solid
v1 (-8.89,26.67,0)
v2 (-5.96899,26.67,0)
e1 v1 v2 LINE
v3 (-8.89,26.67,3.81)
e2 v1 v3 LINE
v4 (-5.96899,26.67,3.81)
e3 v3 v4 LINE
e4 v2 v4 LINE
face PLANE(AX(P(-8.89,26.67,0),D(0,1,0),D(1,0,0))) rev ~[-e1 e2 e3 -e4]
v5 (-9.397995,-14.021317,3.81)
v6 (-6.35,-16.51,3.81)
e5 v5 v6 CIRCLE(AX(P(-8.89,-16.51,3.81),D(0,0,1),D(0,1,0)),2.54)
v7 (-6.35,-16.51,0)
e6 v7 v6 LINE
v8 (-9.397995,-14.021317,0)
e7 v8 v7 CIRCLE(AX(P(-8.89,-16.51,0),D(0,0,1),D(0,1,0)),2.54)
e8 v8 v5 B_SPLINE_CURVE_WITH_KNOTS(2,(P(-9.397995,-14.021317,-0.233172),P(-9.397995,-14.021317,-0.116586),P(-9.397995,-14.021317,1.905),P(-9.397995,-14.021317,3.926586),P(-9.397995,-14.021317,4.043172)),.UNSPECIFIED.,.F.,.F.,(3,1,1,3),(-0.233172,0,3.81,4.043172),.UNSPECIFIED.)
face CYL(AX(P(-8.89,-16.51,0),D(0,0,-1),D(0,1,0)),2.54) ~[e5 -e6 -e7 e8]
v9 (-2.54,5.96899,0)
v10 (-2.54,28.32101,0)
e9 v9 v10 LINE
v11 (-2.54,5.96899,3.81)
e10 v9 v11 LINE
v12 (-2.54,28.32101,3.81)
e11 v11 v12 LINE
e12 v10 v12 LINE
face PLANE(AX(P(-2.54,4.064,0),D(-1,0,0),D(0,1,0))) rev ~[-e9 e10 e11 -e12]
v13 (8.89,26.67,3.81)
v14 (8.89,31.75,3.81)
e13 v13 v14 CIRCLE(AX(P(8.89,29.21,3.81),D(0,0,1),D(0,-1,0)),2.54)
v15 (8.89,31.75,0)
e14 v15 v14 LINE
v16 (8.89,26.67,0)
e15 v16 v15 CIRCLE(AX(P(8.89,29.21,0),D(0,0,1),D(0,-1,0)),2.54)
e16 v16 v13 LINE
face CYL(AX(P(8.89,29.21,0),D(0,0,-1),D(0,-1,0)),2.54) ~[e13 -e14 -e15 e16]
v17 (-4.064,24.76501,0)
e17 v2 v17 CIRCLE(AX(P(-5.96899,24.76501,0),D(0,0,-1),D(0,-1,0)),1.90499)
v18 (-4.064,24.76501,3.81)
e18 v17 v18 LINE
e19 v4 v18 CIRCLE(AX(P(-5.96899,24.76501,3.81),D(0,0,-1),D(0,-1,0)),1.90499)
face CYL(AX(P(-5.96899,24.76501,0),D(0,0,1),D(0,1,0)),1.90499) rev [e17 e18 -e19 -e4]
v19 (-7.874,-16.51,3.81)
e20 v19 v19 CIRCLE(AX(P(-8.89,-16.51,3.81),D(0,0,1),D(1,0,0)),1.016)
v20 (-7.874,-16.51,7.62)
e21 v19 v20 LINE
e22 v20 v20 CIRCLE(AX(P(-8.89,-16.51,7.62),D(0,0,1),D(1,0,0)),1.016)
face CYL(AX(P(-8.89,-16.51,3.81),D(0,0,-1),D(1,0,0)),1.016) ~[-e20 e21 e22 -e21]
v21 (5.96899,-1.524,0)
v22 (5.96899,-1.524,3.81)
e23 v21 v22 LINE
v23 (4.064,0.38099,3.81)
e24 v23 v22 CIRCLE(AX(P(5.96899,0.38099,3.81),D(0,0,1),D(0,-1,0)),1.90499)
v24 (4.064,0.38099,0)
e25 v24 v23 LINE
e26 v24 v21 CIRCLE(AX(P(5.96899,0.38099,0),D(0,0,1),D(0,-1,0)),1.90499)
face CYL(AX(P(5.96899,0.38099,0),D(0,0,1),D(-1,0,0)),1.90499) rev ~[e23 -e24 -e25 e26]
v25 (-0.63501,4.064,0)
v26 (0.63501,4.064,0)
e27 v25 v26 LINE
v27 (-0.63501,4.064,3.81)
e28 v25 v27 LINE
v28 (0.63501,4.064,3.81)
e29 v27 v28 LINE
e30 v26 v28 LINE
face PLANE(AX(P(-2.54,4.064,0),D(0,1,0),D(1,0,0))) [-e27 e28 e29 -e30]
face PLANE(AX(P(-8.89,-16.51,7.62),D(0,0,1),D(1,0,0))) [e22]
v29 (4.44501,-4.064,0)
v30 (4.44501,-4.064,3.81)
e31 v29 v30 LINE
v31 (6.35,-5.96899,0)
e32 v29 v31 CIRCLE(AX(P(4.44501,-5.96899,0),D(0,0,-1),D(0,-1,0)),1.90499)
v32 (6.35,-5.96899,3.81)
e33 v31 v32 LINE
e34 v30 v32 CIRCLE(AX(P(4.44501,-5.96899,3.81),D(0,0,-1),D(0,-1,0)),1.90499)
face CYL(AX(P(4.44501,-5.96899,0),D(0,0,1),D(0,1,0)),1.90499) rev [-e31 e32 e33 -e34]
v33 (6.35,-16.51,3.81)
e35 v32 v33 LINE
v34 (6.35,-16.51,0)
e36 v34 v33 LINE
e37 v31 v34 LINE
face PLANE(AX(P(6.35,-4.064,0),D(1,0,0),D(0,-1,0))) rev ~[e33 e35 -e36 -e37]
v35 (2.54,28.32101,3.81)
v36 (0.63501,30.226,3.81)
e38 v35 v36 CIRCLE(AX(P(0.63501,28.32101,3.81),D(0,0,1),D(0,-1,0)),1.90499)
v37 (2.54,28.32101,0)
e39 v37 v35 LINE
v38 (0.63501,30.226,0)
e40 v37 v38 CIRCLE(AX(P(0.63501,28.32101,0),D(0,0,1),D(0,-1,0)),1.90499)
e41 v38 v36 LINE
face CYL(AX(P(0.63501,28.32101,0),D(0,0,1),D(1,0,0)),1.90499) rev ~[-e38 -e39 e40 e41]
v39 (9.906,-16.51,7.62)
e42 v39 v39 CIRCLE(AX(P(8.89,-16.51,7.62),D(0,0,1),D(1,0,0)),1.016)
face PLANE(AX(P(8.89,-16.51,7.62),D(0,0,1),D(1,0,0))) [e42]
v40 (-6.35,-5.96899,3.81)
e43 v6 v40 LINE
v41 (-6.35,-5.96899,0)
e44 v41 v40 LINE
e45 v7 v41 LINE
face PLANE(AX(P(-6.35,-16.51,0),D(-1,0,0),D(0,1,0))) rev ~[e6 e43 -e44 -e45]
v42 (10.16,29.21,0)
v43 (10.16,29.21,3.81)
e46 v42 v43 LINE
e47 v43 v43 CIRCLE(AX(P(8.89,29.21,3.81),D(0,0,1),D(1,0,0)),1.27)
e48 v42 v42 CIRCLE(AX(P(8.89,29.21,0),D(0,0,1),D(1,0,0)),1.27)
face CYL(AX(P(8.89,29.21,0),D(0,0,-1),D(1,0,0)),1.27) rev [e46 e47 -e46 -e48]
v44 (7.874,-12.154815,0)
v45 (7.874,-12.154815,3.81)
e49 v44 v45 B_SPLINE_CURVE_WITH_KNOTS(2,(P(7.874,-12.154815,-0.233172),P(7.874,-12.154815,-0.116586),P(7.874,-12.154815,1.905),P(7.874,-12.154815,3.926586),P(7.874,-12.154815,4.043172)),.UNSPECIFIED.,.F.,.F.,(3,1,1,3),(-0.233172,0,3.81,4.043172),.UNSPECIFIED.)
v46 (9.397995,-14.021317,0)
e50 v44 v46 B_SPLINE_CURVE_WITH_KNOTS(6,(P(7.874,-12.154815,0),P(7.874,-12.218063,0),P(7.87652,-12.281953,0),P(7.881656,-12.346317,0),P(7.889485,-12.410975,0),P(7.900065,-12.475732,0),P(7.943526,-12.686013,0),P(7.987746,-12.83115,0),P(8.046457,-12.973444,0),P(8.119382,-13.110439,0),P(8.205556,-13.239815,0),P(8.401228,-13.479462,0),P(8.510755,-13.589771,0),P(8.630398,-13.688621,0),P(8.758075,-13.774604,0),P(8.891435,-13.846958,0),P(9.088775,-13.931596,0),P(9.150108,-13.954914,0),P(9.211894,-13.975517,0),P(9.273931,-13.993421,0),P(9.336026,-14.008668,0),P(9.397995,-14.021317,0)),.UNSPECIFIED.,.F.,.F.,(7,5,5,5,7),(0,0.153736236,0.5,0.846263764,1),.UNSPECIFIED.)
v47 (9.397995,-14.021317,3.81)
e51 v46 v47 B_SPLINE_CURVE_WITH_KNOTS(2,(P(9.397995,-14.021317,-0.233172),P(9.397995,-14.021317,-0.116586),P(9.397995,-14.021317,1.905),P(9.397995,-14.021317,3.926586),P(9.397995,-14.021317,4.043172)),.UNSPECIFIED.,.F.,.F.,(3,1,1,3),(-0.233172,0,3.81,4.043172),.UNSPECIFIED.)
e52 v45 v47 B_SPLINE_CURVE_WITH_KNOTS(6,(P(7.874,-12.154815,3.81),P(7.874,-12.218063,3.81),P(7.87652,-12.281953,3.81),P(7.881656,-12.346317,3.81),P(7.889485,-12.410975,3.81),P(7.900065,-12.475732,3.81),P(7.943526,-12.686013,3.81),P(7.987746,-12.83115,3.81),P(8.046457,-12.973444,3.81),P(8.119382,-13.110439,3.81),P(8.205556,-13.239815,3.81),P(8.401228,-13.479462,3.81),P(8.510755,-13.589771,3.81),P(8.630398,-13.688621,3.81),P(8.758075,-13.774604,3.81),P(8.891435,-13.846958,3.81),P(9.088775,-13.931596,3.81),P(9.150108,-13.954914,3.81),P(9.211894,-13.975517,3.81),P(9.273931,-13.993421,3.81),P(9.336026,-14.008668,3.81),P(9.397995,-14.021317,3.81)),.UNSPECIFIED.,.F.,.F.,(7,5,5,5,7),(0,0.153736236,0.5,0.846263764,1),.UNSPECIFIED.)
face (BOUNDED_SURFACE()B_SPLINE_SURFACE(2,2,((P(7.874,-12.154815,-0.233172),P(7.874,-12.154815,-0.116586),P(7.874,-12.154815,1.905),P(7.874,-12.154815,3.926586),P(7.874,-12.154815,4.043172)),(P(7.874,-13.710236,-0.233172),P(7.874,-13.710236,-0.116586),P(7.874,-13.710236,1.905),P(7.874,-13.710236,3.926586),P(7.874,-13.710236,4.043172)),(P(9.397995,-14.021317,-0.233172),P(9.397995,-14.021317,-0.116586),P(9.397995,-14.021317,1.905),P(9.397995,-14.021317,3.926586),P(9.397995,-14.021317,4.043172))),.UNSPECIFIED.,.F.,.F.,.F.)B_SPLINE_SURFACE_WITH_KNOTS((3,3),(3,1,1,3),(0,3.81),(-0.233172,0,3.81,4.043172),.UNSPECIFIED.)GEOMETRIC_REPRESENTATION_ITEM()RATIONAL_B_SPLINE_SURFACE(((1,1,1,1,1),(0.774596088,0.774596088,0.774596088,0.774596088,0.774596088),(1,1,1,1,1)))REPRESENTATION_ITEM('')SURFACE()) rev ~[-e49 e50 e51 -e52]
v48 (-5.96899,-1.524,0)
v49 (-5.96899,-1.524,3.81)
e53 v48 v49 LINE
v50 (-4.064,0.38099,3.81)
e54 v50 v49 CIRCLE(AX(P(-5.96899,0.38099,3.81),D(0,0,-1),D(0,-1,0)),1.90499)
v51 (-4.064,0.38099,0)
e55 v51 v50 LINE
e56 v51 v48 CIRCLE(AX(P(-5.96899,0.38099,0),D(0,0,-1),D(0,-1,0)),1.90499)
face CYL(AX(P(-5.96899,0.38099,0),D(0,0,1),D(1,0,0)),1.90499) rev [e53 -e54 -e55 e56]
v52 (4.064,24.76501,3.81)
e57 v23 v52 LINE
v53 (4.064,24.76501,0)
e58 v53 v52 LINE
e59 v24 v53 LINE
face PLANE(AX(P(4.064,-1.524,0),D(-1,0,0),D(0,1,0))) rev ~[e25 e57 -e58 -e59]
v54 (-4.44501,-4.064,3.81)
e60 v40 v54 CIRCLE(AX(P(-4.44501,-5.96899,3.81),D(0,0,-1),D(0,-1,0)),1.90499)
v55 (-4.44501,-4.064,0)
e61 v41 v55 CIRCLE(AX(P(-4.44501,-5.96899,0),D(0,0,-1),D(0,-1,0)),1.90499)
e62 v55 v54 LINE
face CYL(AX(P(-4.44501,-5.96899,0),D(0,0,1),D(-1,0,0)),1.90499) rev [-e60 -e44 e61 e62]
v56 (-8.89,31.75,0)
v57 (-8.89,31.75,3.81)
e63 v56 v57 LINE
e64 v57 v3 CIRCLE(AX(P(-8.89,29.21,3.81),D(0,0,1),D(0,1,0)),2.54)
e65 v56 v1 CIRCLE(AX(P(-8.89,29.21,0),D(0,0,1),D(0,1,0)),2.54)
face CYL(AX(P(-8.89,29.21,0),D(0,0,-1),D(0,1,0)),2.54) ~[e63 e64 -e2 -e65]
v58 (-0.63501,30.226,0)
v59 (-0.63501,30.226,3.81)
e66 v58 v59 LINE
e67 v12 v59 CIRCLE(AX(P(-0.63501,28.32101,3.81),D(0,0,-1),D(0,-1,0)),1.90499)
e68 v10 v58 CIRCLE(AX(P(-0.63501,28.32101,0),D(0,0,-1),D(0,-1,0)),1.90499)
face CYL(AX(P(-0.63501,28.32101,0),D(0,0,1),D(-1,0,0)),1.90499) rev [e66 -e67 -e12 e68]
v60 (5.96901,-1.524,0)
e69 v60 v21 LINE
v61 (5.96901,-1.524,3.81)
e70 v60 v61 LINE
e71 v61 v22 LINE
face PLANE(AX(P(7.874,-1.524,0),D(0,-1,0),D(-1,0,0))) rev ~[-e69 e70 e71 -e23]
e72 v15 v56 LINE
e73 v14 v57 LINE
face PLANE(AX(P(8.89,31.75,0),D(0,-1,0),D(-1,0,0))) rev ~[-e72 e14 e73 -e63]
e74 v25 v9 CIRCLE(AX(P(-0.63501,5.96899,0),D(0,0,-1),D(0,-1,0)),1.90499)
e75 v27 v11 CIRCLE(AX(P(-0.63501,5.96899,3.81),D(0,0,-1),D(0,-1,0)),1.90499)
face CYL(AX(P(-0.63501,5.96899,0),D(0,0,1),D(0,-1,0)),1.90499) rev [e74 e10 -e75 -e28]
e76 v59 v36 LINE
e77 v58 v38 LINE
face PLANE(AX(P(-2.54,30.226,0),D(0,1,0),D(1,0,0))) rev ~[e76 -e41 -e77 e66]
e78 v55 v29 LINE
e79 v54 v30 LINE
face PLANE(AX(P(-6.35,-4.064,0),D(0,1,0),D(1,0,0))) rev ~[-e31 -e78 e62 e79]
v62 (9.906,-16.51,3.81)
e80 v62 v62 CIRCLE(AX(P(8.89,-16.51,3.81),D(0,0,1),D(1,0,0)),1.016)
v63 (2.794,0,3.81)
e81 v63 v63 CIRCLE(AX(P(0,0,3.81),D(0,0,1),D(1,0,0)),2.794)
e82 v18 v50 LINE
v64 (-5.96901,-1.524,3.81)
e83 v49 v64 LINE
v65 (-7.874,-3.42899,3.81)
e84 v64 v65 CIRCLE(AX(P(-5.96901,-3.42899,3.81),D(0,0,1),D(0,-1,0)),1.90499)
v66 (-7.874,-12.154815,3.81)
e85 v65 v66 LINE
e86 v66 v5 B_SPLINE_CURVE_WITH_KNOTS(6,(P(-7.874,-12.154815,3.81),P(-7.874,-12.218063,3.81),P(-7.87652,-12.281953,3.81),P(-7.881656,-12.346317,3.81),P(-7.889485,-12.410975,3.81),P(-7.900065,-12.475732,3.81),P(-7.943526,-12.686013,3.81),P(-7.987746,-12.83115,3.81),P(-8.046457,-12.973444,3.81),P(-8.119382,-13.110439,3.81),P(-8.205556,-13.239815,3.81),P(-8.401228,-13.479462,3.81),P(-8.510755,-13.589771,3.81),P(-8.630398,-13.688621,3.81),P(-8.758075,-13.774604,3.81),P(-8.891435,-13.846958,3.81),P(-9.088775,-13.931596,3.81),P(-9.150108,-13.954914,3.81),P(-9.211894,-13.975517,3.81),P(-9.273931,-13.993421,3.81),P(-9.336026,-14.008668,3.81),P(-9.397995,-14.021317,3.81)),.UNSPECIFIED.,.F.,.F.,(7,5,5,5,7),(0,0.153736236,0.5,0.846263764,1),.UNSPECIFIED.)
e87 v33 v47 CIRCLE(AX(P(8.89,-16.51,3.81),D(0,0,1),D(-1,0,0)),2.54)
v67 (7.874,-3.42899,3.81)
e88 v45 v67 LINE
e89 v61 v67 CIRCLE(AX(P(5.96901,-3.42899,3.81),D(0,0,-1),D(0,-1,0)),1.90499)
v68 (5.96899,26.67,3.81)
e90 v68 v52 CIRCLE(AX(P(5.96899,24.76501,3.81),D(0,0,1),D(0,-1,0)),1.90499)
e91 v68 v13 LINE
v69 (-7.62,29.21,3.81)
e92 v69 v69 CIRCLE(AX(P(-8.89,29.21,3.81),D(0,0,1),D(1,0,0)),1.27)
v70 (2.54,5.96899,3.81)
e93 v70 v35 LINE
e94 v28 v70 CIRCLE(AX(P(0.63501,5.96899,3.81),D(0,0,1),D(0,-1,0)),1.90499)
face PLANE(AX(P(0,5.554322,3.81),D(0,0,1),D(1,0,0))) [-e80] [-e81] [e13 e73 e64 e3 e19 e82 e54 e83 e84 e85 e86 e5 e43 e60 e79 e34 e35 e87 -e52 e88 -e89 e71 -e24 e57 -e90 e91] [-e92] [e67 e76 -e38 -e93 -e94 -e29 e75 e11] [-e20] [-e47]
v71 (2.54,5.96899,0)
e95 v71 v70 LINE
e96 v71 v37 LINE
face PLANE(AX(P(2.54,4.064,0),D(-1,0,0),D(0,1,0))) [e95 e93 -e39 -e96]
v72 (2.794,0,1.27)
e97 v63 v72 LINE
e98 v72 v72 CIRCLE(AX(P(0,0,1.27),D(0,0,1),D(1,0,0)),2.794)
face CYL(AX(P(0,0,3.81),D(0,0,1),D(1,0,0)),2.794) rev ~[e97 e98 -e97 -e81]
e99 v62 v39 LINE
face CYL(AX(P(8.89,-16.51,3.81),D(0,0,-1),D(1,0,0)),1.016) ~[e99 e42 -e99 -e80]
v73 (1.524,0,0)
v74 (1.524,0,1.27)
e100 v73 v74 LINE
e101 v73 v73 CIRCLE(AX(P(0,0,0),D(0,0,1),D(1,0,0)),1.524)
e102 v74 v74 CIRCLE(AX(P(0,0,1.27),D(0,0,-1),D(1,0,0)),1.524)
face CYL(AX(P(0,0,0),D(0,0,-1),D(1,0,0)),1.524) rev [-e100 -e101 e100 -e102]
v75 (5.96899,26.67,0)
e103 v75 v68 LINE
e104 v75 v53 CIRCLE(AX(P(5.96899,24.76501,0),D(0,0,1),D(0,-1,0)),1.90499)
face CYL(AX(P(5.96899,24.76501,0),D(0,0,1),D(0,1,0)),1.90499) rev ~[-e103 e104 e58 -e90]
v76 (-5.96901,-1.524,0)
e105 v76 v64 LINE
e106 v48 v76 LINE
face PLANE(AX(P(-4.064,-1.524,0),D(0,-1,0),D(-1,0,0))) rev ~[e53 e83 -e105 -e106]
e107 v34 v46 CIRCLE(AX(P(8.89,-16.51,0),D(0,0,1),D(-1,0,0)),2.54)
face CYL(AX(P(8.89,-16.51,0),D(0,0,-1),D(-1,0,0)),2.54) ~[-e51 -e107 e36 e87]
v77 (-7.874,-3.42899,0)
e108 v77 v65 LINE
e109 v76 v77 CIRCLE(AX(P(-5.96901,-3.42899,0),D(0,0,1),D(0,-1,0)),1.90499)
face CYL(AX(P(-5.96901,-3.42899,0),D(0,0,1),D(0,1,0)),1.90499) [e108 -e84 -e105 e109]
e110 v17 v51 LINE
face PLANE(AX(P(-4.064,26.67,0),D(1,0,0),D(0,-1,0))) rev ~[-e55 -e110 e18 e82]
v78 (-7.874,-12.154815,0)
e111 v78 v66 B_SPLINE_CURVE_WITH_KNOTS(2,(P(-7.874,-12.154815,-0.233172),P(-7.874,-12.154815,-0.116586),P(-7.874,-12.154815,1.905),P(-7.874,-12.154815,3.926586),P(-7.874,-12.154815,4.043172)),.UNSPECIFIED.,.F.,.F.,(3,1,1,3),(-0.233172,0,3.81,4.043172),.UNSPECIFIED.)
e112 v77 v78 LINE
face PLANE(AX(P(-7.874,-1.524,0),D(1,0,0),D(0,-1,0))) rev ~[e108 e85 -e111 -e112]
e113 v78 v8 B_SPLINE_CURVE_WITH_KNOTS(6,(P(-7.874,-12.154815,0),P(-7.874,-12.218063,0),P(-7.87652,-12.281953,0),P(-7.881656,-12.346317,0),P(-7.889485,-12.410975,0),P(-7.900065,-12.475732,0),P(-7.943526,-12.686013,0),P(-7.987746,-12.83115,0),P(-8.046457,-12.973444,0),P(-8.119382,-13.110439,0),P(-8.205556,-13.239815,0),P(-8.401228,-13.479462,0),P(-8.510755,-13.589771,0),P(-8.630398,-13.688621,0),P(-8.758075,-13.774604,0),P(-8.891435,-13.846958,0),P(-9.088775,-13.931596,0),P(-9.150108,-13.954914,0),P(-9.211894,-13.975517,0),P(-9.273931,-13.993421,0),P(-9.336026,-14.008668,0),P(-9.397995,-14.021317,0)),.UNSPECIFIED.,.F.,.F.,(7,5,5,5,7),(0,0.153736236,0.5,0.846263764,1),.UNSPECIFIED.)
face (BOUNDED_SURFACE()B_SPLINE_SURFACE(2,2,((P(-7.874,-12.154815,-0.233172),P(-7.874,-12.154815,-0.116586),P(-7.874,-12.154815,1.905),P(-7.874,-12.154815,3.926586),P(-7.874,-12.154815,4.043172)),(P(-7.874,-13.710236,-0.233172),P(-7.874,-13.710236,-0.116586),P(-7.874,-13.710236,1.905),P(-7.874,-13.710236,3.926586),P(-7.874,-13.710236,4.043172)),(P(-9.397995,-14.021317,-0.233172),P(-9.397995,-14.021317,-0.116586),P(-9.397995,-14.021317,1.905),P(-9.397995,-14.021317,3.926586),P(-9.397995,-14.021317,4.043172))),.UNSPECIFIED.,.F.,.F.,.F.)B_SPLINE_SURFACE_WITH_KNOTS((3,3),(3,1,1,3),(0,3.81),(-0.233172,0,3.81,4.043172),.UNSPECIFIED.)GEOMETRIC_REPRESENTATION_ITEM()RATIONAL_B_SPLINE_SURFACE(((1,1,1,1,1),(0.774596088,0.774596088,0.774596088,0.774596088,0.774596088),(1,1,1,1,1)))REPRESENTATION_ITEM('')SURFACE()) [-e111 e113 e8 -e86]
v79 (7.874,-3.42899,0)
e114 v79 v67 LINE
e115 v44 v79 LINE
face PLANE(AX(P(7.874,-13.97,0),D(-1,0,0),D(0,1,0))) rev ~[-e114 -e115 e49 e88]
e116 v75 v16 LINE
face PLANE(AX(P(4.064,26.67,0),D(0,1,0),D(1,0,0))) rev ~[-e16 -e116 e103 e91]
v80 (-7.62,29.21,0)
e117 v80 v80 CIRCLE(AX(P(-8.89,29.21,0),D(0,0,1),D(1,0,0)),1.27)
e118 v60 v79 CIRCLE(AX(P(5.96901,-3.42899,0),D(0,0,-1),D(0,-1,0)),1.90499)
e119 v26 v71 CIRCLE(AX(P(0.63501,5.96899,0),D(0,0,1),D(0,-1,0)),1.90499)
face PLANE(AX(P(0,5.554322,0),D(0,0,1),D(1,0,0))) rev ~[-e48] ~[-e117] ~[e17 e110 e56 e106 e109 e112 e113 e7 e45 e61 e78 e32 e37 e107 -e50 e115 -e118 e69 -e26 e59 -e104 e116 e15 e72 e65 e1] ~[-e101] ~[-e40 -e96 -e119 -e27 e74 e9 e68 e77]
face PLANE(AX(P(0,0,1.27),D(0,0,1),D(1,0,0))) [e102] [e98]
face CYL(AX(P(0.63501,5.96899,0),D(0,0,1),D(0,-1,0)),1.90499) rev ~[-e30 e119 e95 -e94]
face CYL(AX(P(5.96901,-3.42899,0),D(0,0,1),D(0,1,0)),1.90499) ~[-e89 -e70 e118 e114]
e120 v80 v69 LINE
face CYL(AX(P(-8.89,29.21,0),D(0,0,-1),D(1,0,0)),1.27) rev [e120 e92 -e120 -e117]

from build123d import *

# Parameters (mm, degrees)
F0_R     = 1.524
F0_R_2   = 1.27
F0_W     = 5.08
F0_H     = 26.162
F1_DEPTH = 3.81
F2_R     = 1.90499
F3_R     = 1.016
F4_DEPTH = 3.81
F5_R     = 2.794
F6_DEPTH = 2.54


# Not quite as in the source:
# - a fillet or chamfer is up to 0.001 mm smaller than in the source, because OpenCascade refuses the exact size


with BuildPart() as f1:
    # F0 (on Top) → F1 (new body)
    with BuildSketch(Plane.XY):
        with BuildLine():
            ThreePointArc((-8.89, 31.75), (-11.43, 29.21), (-8.89, 26.67))
            Line((-8.89, 26.67), (-4.064, 26.67))
            Line((-4.064, 26.67), (-4.064, -1.524))
            Line((-4.064, -1.524), (-7.874, -1.524))
            Line((-7.874, -1.524), (-7.874, -13.97))
            Line((-7.874, -13.97), (-8.89, -13.97))
            ThreePointArc((-8.89, -13.97), (-10.6860512242, -18.3060512242), (-6.35, -16.51))
            Line((-6.35, -16.51), (-6.35, -4.064))
            Line((-6.35, -4.064), (6.35, -4.064))
            Line((6.35, -4.064), (6.35, -16.51))
            ThreePointArc((6.35, -16.51), (10.6860512242, -18.3060512242), (8.89, -13.97))
            Line((8.89, -13.97), (7.874, -13.97))
            Line((7.874, -13.97), (7.874, -1.524))
            Line((7.874, -1.524), (4.064, -1.524))
            Line((4.064, -1.524), (4.064, 26.67))
            Line((4.064, 26.67), (8.89, 26.67))
            ThreePointArc((8.89, 26.67), (11.43, 29.21), (8.89, 31.75))
            Line((8.89, 31.75), (-8.89, 31.75))
        make_face()
        Circle(F0_R, mode=Mode.SUBTRACT)
        with Locations((-8.89, 29.21)):
            Circle(F0_R_2, mode=Mode.SUBTRACT)
        with Locations((0, 17.145)):
            Rectangle(F0_W, F0_H, mode=Mode.SUBTRACT)
        with Locations((8.89, 29.21)):
            Circle(F0_R_2, mode=Mode.SUBTRACT)
    extrude(amount=F1_DEPTH)

    # F2 (radius 1.905 in the source; OpenCascade refuses exactly that, so slightly less here)
    f2_edges = [f1.edges().sort_by_distance(p)[0] for p in [
        (6.35, -4.064, 1.905),
        (-6.35, -4.064, 1.905),
        (-4.064, -1.524, 1.905),
        (-7.874, -1.524, 1.905),
        (7.874, -1.524, 1.905),
        (4.064, 26.67, 1.905),
        (4.064, -1.524, 1.905),
        (-4.064, 26.67, 1.905),
        (2.54, 30.226, 1.905),
        (-2.54, 30.226, 1.905),
        (-2.54, 4.064, 1.905),
        (2.54, 4.064, 1.905),
        (7.874, -13.97, 1.905),
        (-7.874, -13.97, 1.905),
    ]]
    fillet(f2_edges, radius=F2_R)

    # F3 (on face) → F4 (join)
    with BuildSketch(Plane.XY.offset(3.81)):
        with Locations((-8.89, -16.51)):
            Circle(F3_R)
        with Locations((8.89, -16.51)):
            Circle(F3_R)
    extrude(amount=F4_DEPTH)

    # F5 (on face) → F6 (cut)
    with BuildSketch(Plane.XY.offset(3.81)):
        Circle(F5_R)
    extrude(amount=-F6_DEPTH, mode=Mode.SUBTRACT)


solid = f1.part
